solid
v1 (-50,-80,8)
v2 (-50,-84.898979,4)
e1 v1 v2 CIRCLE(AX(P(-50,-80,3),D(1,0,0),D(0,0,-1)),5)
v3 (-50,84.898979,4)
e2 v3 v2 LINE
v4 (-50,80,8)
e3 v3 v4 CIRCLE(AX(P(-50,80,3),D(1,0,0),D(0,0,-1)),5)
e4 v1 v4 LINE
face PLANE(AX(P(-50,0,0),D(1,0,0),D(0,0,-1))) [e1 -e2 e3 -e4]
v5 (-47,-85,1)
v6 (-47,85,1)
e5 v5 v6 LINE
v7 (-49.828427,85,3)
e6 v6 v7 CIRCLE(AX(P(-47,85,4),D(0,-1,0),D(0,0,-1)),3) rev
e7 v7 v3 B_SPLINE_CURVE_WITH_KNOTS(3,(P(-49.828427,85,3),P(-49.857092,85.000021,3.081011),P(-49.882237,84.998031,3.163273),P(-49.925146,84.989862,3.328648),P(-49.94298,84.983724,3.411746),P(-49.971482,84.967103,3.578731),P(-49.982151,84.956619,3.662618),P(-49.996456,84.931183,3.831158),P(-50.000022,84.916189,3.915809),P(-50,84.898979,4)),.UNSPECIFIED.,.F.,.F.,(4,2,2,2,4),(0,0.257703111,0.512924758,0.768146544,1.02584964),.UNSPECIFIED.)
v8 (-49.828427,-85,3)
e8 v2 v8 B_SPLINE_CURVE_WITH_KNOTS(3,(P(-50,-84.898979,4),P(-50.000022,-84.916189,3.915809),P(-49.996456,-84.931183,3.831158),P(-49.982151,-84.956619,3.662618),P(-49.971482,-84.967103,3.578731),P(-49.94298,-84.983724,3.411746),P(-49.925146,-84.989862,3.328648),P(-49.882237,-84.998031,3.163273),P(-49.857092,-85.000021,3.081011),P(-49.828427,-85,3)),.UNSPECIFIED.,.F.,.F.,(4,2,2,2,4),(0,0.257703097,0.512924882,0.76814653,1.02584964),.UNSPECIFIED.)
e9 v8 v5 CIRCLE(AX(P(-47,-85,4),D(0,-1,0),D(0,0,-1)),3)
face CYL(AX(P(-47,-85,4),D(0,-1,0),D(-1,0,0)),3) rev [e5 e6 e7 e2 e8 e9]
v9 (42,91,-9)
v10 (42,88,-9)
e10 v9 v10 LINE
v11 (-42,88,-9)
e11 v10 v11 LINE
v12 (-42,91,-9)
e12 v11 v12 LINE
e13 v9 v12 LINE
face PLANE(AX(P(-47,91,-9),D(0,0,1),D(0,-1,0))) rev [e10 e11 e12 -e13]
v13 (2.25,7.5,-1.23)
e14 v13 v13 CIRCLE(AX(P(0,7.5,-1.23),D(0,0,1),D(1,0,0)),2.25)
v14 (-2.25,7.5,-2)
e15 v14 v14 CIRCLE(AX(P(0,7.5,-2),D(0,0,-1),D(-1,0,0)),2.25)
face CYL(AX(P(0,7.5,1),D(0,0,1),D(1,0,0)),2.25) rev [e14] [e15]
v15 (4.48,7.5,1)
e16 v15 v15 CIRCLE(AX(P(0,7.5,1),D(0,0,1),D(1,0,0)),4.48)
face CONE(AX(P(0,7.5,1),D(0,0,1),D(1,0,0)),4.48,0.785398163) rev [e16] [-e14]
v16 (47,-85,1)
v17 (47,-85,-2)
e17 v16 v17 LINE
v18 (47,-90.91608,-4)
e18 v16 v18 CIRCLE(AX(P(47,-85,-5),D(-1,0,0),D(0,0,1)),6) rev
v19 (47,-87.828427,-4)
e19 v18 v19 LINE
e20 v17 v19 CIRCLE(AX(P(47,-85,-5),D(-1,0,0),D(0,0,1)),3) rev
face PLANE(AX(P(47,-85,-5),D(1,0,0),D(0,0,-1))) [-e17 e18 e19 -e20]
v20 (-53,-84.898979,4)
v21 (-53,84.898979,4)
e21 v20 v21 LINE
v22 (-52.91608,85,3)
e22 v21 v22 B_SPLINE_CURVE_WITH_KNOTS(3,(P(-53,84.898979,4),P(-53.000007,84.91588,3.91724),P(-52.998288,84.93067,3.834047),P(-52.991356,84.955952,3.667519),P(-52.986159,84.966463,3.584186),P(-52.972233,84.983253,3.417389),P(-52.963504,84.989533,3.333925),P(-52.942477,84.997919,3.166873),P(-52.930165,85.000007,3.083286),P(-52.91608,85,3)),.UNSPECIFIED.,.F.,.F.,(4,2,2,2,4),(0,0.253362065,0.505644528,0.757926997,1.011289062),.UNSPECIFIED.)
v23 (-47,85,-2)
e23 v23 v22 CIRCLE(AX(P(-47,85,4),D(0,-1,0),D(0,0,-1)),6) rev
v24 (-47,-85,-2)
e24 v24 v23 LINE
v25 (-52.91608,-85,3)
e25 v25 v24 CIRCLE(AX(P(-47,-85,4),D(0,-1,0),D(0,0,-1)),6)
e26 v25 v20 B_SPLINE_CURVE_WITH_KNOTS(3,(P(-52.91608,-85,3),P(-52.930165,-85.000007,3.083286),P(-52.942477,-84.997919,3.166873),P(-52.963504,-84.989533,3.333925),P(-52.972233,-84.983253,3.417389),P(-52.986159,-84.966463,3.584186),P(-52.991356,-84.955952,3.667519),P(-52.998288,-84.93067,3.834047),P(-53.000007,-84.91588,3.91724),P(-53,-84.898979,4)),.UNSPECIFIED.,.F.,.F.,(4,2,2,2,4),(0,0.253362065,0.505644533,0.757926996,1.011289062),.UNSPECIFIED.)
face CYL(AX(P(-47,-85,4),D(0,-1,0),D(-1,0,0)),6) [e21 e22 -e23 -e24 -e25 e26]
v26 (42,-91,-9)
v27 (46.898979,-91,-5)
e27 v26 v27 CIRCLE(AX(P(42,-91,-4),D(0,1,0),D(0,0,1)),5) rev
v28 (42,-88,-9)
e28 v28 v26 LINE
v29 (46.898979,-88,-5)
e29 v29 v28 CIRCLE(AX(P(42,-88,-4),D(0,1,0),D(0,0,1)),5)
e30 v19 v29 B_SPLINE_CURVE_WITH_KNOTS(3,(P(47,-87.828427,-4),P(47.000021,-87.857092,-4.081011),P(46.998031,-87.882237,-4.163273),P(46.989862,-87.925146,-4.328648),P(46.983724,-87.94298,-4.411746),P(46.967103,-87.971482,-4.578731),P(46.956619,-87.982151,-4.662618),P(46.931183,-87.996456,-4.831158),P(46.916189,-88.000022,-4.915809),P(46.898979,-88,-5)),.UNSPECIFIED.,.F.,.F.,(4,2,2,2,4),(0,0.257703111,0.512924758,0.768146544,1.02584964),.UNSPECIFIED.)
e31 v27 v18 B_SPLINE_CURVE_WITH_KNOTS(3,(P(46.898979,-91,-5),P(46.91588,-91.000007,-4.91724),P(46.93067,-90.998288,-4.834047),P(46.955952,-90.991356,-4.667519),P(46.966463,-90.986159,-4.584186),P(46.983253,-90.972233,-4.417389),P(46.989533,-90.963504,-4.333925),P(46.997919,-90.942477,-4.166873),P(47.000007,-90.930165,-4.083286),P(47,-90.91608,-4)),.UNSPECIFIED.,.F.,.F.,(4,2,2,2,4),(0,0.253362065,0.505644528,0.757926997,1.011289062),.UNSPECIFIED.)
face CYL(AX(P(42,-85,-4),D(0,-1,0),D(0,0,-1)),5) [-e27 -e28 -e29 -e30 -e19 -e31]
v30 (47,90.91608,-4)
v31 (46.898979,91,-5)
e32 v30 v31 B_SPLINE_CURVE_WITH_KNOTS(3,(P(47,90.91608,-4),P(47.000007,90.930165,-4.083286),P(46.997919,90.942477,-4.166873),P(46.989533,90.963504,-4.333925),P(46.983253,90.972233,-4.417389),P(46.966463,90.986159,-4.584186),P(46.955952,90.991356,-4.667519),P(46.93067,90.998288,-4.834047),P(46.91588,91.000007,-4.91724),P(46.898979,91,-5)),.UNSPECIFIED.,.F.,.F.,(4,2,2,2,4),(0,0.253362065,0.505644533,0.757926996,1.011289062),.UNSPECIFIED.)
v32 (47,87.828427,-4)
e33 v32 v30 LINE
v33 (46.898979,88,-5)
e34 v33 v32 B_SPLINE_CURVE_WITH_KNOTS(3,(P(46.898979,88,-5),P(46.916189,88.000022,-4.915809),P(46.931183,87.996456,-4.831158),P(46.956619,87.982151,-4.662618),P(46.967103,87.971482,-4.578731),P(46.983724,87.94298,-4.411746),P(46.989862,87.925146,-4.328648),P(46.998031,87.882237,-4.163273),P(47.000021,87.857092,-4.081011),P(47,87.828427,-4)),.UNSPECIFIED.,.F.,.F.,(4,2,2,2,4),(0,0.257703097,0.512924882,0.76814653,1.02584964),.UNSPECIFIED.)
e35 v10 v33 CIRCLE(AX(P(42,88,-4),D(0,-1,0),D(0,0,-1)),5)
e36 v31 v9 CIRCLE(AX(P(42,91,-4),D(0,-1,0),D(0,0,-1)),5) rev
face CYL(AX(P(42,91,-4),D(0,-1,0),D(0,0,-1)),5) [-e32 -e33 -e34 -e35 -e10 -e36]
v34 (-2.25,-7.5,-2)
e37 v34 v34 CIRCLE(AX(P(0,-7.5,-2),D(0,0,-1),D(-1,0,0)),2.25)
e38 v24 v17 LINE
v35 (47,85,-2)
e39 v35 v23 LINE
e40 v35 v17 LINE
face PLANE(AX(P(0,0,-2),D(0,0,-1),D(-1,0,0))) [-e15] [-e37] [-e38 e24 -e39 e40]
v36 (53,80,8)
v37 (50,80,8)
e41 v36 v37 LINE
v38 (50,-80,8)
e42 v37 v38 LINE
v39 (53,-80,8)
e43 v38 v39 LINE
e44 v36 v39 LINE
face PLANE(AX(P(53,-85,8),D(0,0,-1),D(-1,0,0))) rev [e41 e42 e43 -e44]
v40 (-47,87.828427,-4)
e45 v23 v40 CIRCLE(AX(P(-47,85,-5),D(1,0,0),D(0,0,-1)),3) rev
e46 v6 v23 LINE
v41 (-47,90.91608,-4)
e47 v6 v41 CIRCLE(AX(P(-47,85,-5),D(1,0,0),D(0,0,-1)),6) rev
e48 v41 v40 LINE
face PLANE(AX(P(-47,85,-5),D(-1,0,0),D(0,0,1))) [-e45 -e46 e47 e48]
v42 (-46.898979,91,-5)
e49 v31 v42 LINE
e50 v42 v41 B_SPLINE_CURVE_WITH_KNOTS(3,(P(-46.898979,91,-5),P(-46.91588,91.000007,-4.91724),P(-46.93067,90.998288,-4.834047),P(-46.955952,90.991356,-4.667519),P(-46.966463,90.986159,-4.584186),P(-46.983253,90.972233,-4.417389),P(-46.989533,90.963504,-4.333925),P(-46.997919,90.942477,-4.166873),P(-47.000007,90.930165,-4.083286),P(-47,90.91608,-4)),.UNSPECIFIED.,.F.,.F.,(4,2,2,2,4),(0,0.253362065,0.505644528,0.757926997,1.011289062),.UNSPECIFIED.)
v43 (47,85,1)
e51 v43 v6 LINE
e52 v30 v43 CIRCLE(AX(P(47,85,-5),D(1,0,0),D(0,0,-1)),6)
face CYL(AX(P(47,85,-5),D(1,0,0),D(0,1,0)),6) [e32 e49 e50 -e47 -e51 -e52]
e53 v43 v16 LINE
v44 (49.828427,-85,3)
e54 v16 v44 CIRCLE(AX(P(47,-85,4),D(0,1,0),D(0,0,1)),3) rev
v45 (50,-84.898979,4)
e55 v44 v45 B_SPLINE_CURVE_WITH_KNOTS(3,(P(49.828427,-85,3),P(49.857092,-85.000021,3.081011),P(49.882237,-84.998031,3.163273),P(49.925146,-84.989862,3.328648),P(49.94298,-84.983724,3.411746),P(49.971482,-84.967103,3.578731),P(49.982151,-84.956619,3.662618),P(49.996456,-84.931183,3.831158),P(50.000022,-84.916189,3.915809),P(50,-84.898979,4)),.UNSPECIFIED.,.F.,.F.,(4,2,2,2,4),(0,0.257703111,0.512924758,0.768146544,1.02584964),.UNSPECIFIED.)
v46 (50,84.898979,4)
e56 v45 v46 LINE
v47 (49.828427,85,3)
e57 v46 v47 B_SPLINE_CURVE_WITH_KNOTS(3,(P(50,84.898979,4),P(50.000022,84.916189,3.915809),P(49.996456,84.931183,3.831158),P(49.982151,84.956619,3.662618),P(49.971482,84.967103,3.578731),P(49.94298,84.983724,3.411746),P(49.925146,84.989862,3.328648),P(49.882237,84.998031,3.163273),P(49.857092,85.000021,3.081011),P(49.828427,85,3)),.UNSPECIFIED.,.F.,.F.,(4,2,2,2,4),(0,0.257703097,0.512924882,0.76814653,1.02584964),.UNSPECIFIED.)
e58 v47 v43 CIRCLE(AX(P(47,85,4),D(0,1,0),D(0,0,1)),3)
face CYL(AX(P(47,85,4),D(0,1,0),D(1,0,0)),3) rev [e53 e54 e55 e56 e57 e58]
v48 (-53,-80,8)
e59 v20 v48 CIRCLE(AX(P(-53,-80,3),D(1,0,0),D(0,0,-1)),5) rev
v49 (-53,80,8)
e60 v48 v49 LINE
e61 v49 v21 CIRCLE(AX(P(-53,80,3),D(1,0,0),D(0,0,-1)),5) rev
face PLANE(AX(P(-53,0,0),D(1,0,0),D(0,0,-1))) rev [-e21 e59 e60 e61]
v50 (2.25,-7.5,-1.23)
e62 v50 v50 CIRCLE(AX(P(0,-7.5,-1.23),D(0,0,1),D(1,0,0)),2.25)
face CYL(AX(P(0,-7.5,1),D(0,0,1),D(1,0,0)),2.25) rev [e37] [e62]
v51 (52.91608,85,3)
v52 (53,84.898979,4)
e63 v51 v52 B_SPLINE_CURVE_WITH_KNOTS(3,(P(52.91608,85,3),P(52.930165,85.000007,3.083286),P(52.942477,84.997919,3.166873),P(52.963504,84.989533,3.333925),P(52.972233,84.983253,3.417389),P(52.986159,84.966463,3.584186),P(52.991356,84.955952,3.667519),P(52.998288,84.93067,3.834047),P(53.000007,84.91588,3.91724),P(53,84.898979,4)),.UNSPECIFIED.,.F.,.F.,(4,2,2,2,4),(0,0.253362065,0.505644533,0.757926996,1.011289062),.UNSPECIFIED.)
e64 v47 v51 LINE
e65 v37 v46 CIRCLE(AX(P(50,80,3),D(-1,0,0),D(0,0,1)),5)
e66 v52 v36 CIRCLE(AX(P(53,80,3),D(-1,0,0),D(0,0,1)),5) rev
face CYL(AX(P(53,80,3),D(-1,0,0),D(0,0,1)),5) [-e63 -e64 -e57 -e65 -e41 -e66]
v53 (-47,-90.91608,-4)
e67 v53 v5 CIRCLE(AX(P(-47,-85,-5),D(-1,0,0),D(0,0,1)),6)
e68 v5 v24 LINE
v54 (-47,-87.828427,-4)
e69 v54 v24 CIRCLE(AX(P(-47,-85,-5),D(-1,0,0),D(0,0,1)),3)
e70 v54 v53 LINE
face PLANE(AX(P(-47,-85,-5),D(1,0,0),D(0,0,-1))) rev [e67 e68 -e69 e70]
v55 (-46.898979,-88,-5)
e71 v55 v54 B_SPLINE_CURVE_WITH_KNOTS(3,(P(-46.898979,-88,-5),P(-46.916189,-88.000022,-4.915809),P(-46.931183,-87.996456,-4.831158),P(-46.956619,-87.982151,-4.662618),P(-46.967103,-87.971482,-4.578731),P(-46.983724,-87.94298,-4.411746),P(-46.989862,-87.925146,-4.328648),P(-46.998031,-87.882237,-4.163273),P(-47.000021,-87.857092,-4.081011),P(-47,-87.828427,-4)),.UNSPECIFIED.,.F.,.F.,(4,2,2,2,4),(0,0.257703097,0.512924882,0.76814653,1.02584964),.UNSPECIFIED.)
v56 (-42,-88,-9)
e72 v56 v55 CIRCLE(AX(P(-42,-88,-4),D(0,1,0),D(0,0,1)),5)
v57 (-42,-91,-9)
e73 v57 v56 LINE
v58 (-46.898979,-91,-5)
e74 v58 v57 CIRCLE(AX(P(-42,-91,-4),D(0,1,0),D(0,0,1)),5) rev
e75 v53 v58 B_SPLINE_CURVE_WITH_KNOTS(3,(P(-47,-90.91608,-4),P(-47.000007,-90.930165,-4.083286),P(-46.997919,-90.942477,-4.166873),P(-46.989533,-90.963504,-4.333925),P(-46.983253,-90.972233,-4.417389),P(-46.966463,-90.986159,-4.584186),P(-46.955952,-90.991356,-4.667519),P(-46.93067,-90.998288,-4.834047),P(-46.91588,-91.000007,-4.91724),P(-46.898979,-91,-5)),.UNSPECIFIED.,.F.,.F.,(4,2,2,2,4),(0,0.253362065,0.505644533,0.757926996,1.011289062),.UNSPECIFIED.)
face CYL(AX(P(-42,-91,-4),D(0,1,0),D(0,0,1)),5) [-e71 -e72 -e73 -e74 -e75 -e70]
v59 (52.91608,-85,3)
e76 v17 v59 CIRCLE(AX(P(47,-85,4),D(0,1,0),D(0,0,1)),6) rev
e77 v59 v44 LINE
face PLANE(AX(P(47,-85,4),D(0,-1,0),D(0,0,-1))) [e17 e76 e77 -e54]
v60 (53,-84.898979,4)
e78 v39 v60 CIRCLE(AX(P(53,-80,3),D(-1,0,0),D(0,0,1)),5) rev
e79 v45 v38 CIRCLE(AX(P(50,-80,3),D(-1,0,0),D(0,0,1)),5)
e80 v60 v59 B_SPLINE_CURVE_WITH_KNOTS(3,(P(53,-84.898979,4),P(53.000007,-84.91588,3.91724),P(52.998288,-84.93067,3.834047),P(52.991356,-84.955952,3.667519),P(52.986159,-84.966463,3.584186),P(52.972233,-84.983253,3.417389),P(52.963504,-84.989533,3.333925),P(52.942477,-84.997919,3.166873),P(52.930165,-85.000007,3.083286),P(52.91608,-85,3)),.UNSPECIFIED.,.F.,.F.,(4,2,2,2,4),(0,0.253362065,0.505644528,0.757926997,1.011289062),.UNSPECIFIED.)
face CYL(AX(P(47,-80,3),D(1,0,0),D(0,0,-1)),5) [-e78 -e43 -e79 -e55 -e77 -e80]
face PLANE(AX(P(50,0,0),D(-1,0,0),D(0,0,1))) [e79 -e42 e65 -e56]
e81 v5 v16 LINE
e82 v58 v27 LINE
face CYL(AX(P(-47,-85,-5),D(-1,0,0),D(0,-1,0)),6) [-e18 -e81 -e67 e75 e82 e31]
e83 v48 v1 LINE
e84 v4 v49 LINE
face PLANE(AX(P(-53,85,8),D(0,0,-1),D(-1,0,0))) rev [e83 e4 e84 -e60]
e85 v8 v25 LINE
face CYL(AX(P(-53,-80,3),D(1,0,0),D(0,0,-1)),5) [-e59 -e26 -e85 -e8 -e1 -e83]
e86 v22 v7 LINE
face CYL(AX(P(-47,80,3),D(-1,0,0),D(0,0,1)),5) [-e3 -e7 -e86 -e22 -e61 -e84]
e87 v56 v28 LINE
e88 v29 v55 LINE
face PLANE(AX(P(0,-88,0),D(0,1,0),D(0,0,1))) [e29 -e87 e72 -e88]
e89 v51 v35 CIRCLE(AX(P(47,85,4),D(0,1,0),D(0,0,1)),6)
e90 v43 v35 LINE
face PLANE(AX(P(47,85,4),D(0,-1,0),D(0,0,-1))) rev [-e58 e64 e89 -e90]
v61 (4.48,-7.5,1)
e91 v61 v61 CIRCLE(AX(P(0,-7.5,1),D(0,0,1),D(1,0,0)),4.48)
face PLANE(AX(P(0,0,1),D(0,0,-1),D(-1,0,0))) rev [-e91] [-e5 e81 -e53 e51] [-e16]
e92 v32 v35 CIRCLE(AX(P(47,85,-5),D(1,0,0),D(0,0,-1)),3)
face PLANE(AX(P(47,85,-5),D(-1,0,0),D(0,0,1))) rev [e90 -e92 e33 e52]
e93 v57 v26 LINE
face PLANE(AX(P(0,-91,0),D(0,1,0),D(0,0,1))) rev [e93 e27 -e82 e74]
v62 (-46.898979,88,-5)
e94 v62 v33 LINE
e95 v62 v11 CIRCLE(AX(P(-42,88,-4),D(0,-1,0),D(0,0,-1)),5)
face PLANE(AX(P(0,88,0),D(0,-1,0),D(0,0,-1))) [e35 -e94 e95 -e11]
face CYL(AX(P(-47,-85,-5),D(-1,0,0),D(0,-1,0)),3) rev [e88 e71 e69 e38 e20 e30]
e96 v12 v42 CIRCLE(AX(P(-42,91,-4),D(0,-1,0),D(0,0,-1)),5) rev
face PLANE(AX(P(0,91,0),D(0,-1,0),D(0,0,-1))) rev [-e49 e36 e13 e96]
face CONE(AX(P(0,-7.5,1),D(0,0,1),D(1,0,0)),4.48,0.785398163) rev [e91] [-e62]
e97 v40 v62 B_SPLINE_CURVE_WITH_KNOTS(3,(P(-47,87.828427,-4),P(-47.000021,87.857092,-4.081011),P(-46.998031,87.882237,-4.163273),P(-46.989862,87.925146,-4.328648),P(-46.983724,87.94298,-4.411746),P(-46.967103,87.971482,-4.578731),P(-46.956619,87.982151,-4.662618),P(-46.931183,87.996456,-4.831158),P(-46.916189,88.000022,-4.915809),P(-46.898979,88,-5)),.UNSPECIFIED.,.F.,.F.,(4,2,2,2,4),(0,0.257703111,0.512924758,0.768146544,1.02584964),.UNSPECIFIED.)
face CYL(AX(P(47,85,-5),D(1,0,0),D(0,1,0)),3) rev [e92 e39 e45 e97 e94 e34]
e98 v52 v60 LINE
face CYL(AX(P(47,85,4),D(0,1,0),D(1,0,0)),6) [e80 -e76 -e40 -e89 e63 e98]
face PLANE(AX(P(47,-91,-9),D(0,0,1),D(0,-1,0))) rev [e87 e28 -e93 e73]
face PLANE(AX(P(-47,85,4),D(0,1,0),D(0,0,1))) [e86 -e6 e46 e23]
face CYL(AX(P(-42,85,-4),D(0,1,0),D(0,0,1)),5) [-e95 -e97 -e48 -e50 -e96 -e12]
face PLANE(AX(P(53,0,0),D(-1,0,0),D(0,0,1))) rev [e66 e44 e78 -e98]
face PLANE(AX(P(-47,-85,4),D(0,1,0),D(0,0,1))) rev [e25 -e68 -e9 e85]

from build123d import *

# Parameters (mm, degrees)
SKETCH5_W                      = 100
SKETCH5_H                      = 170
BOSS_EXTRUDE2_DEPTH            = 1
CONVERT_SOLID1_START           = -50
CONVERT_SOLID1_OUTLINE_W       = 170
CONVERT_SOLID1_OUTLINE_H       = 2
CONVERT_SOLID1_DEPTH           = 100
CSK_FOR_M4_SFHCS1_AT_2_COUNT   = 2
CSK_FOR_M4_SFHCS1_AT_2_PITCH   = 15
EDGE_FLANGE3_STRIP_W           = 18
EDGE_FLANGE3_STRIP_H           = 3
EDGE_FLANGE3_STRIP_CUT_DEPTH   = 170
EDGE_FLANGE3_STRIP_2_W         = 18
EDGE_FLANGE3_STRIP_2_H         = 3
EDGE_FLANGE3_STRIP_CUT_2_DEPTH = 170
EDGE_FLANGE3_DEPTH             = 170
EDGE_FLANGE3_BEND_DEPTH        = 170
EDGE_FLANGE4_DEPTH             = 94
EDGE_FLANGE4_BEND_DEPTH        = 94
FILLET1_R                      = 5


# Read off the part's stored shape, not the designer's step: Convert-Solid1
# Sheet-metal steps are written as plain solids
with BuildPart() as part:
    # Sketch5 → Boss-Extrude2 (new body)
    with BuildSketch(Plane.XY):
        Rectangle(SKETCH5_W, SKETCH5_H)
    extrude(amount=BOSS_EXTRUDE2_DEPTH)

    # Convert-Solid1 outline → Convert-Solid1 (add)
    with BuildSketch(Plane.YZ.offset(CONVERT_SOLID1_START)):
        with Locations((0, -1)):
            Rectangle(CONVERT_SOLID1_OUTLINE_W, CONVERT_SOLID1_OUTLINE_H)
    extrude(amount=CONVERT_SOLID1_DEPTH)

    # Sketch23 → CSK for M4 SFHCS1 (revolve, cut)
    with BuildSketch(Plane(origin=(0, -7.5, 1), x_dir=(0, -1, 0), z_dir=(1, 0, 0))):
        Polygon((0, 0), (0, 3), (2.25, 3), (2.25, 2.23), (4.48, 0), align=None)
    csk_for_m4_sfhcs1 = revolve(axis=Axis((0, -7.5, 7.35), (0, 0, -1)), mode=Mode.SUBTRACT)

    # CSK for M4 SFHCS1 at 2: CSK for M4 SFHCS1 ×2
    with Locations(*[(0, i * CSK_FOR_M4_SFHCS1_AT_2_PITCH, 0) for i in range(1, CSK_FOR_M4_SFHCS1_AT_2_COUNT)]):
        add(csk_for_m4_sfhcs1, mode=Mode.SUBTRACT)

    # Edge-Flange3 strip (across the edge) → Edge-Flange3 strip cut (cut)
    with BuildSketch(Plane(origin=(50, -85, 1), x_dir=(-1, 0, 0), z_dir=(0, 1, 0))):
        with Locations((-6, -1.5)):
            Rectangle(EDGE_FLANGE3_STRIP_W, EDGE_FLANGE3_STRIP_H)
    extrude(amount=EDGE_FLANGE3_STRIP_CUT_DEPTH, mode=Mode.SUBTRACT)

    # Edge-Flange3 strip 2 (across the edge) → Edge-Flange3 strip cut 2 (cut)
    with BuildSketch(Plane(origin=(-50, 85, 1), x_dir=(1, 0, 0), z_dir=(0, -1, 0))):
        with Locations((-6, -1.5)):
            Rectangle(EDGE_FLANGE3_STRIP_2_W, EDGE_FLANGE3_STRIP_2_H)
    extrude(amount=EDGE_FLANGE3_STRIP_CUT_2_DEPTH, mode=Mode.SUBTRACT)

    # Edge-Flange3 section (across the edge) → Edge-Flange3 (add)
    with BuildSketch(Plane(origin=(50, -85, 1), x_dir=(-1, 0, 0), z_dir=(0, 1, 0))):
        with BuildLine():
            Line((-3, 3), (-3, 7))
            Line((-3, 7), (0, 7))
            Line((0, 7), (0, 3))
            ThreePointArc((0, 3), (0.878679656, 0.878679656), (3, 0))
            Line((3, 0), (3, -3))
            ThreePointArc((3, -3), (-1.242640687, -1.242640687), (-3, 3))
        make_face()
    extrude(amount=EDGE_FLANGE3_DEPTH)

    # Edge-Flange3 section 2 (across the edge) → Edge-Flange3 bend (add)
    with BuildSketch(Plane(origin=(-50, 85, 1), x_dir=(1, 0, 0), z_dir=(0, -1, 0))):
        with BuildLine():
            Line((-3, 3), (-3, 7))
            Line((-3, 7), (0, 7))
            Line((0, 7), (0, 3))
            ThreePointArc((0, 3), (0.878679656, 0.878679656), (3, 0))
            Line((3, 0), (3, -3))
            ThreePointArc((3, -3), (-1.242640687, -1.242640687), (-3, 3))
        make_face()
    extrude(amount=EDGE_FLANGE3_BEND_DEPTH)

    # Edge-Flange4 section (across the edge) → Edge-Flange4 (add)
    with BuildSketch(Plane(origin=(47, -88, -2), x_dir=(0, 1, 0), z_dir=(-1, 0, 0))):
        with BuildLine():
            Line((-3, 3), (-3, 7))
            Line((-3, 7), (0, 7))
            Line((0, 7), (0, 3))
            ThreePointArc((0, 3), (0.878679656, 0.878679656), (3, 0))
            Line((3, 0), (3, -3))
            ThreePointArc((3, -3), (-1.242640687, -1.242640687), (-3, 3))
        make_face()
    extrude(amount=EDGE_FLANGE4_DEPTH)

    # Edge-Flange4 section 2 (across the edge) → Edge-Flange4 bend (add)
    with BuildSketch(Plane(origin=(-47, 88, -2), x_dir=(0, -1, 0), z_dir=(1, 0, 0))):
        with BuildLine():
            Line((-3, 3), (-3, 7))
            Line((-3, 7), (0, 7))
            Line((0, 7), (0, 3))
            ThreePointArc((0, 3), (0.878679656, 0.878679656), (3, 0))
            Line((3, 0), (3, -3))
            ThreePointArc((3, -3), (-1.242640687, -1.242640687), (-3, 3))
        make_face()
    extrude(amount=EDGE_FLANGE4_BEND_DEPTH)

    # Fillet1
    fillet1_edges = [part.edges().sort_by_distance(p)[0] for p in [
        (51.5, -85, 8),
        (51.5, 85, 8),
        (47, 89.5, -9),
        (-47, 89.5, -9),
        (-51.5, 85, 8),
        (-51.5, -85, 8),
        (-47, -89.5, -9),
        (47, -89.5, -9),
    ]]
    fillet(fillet1_edges, radius=FILLET1_R)


solid = part.part
